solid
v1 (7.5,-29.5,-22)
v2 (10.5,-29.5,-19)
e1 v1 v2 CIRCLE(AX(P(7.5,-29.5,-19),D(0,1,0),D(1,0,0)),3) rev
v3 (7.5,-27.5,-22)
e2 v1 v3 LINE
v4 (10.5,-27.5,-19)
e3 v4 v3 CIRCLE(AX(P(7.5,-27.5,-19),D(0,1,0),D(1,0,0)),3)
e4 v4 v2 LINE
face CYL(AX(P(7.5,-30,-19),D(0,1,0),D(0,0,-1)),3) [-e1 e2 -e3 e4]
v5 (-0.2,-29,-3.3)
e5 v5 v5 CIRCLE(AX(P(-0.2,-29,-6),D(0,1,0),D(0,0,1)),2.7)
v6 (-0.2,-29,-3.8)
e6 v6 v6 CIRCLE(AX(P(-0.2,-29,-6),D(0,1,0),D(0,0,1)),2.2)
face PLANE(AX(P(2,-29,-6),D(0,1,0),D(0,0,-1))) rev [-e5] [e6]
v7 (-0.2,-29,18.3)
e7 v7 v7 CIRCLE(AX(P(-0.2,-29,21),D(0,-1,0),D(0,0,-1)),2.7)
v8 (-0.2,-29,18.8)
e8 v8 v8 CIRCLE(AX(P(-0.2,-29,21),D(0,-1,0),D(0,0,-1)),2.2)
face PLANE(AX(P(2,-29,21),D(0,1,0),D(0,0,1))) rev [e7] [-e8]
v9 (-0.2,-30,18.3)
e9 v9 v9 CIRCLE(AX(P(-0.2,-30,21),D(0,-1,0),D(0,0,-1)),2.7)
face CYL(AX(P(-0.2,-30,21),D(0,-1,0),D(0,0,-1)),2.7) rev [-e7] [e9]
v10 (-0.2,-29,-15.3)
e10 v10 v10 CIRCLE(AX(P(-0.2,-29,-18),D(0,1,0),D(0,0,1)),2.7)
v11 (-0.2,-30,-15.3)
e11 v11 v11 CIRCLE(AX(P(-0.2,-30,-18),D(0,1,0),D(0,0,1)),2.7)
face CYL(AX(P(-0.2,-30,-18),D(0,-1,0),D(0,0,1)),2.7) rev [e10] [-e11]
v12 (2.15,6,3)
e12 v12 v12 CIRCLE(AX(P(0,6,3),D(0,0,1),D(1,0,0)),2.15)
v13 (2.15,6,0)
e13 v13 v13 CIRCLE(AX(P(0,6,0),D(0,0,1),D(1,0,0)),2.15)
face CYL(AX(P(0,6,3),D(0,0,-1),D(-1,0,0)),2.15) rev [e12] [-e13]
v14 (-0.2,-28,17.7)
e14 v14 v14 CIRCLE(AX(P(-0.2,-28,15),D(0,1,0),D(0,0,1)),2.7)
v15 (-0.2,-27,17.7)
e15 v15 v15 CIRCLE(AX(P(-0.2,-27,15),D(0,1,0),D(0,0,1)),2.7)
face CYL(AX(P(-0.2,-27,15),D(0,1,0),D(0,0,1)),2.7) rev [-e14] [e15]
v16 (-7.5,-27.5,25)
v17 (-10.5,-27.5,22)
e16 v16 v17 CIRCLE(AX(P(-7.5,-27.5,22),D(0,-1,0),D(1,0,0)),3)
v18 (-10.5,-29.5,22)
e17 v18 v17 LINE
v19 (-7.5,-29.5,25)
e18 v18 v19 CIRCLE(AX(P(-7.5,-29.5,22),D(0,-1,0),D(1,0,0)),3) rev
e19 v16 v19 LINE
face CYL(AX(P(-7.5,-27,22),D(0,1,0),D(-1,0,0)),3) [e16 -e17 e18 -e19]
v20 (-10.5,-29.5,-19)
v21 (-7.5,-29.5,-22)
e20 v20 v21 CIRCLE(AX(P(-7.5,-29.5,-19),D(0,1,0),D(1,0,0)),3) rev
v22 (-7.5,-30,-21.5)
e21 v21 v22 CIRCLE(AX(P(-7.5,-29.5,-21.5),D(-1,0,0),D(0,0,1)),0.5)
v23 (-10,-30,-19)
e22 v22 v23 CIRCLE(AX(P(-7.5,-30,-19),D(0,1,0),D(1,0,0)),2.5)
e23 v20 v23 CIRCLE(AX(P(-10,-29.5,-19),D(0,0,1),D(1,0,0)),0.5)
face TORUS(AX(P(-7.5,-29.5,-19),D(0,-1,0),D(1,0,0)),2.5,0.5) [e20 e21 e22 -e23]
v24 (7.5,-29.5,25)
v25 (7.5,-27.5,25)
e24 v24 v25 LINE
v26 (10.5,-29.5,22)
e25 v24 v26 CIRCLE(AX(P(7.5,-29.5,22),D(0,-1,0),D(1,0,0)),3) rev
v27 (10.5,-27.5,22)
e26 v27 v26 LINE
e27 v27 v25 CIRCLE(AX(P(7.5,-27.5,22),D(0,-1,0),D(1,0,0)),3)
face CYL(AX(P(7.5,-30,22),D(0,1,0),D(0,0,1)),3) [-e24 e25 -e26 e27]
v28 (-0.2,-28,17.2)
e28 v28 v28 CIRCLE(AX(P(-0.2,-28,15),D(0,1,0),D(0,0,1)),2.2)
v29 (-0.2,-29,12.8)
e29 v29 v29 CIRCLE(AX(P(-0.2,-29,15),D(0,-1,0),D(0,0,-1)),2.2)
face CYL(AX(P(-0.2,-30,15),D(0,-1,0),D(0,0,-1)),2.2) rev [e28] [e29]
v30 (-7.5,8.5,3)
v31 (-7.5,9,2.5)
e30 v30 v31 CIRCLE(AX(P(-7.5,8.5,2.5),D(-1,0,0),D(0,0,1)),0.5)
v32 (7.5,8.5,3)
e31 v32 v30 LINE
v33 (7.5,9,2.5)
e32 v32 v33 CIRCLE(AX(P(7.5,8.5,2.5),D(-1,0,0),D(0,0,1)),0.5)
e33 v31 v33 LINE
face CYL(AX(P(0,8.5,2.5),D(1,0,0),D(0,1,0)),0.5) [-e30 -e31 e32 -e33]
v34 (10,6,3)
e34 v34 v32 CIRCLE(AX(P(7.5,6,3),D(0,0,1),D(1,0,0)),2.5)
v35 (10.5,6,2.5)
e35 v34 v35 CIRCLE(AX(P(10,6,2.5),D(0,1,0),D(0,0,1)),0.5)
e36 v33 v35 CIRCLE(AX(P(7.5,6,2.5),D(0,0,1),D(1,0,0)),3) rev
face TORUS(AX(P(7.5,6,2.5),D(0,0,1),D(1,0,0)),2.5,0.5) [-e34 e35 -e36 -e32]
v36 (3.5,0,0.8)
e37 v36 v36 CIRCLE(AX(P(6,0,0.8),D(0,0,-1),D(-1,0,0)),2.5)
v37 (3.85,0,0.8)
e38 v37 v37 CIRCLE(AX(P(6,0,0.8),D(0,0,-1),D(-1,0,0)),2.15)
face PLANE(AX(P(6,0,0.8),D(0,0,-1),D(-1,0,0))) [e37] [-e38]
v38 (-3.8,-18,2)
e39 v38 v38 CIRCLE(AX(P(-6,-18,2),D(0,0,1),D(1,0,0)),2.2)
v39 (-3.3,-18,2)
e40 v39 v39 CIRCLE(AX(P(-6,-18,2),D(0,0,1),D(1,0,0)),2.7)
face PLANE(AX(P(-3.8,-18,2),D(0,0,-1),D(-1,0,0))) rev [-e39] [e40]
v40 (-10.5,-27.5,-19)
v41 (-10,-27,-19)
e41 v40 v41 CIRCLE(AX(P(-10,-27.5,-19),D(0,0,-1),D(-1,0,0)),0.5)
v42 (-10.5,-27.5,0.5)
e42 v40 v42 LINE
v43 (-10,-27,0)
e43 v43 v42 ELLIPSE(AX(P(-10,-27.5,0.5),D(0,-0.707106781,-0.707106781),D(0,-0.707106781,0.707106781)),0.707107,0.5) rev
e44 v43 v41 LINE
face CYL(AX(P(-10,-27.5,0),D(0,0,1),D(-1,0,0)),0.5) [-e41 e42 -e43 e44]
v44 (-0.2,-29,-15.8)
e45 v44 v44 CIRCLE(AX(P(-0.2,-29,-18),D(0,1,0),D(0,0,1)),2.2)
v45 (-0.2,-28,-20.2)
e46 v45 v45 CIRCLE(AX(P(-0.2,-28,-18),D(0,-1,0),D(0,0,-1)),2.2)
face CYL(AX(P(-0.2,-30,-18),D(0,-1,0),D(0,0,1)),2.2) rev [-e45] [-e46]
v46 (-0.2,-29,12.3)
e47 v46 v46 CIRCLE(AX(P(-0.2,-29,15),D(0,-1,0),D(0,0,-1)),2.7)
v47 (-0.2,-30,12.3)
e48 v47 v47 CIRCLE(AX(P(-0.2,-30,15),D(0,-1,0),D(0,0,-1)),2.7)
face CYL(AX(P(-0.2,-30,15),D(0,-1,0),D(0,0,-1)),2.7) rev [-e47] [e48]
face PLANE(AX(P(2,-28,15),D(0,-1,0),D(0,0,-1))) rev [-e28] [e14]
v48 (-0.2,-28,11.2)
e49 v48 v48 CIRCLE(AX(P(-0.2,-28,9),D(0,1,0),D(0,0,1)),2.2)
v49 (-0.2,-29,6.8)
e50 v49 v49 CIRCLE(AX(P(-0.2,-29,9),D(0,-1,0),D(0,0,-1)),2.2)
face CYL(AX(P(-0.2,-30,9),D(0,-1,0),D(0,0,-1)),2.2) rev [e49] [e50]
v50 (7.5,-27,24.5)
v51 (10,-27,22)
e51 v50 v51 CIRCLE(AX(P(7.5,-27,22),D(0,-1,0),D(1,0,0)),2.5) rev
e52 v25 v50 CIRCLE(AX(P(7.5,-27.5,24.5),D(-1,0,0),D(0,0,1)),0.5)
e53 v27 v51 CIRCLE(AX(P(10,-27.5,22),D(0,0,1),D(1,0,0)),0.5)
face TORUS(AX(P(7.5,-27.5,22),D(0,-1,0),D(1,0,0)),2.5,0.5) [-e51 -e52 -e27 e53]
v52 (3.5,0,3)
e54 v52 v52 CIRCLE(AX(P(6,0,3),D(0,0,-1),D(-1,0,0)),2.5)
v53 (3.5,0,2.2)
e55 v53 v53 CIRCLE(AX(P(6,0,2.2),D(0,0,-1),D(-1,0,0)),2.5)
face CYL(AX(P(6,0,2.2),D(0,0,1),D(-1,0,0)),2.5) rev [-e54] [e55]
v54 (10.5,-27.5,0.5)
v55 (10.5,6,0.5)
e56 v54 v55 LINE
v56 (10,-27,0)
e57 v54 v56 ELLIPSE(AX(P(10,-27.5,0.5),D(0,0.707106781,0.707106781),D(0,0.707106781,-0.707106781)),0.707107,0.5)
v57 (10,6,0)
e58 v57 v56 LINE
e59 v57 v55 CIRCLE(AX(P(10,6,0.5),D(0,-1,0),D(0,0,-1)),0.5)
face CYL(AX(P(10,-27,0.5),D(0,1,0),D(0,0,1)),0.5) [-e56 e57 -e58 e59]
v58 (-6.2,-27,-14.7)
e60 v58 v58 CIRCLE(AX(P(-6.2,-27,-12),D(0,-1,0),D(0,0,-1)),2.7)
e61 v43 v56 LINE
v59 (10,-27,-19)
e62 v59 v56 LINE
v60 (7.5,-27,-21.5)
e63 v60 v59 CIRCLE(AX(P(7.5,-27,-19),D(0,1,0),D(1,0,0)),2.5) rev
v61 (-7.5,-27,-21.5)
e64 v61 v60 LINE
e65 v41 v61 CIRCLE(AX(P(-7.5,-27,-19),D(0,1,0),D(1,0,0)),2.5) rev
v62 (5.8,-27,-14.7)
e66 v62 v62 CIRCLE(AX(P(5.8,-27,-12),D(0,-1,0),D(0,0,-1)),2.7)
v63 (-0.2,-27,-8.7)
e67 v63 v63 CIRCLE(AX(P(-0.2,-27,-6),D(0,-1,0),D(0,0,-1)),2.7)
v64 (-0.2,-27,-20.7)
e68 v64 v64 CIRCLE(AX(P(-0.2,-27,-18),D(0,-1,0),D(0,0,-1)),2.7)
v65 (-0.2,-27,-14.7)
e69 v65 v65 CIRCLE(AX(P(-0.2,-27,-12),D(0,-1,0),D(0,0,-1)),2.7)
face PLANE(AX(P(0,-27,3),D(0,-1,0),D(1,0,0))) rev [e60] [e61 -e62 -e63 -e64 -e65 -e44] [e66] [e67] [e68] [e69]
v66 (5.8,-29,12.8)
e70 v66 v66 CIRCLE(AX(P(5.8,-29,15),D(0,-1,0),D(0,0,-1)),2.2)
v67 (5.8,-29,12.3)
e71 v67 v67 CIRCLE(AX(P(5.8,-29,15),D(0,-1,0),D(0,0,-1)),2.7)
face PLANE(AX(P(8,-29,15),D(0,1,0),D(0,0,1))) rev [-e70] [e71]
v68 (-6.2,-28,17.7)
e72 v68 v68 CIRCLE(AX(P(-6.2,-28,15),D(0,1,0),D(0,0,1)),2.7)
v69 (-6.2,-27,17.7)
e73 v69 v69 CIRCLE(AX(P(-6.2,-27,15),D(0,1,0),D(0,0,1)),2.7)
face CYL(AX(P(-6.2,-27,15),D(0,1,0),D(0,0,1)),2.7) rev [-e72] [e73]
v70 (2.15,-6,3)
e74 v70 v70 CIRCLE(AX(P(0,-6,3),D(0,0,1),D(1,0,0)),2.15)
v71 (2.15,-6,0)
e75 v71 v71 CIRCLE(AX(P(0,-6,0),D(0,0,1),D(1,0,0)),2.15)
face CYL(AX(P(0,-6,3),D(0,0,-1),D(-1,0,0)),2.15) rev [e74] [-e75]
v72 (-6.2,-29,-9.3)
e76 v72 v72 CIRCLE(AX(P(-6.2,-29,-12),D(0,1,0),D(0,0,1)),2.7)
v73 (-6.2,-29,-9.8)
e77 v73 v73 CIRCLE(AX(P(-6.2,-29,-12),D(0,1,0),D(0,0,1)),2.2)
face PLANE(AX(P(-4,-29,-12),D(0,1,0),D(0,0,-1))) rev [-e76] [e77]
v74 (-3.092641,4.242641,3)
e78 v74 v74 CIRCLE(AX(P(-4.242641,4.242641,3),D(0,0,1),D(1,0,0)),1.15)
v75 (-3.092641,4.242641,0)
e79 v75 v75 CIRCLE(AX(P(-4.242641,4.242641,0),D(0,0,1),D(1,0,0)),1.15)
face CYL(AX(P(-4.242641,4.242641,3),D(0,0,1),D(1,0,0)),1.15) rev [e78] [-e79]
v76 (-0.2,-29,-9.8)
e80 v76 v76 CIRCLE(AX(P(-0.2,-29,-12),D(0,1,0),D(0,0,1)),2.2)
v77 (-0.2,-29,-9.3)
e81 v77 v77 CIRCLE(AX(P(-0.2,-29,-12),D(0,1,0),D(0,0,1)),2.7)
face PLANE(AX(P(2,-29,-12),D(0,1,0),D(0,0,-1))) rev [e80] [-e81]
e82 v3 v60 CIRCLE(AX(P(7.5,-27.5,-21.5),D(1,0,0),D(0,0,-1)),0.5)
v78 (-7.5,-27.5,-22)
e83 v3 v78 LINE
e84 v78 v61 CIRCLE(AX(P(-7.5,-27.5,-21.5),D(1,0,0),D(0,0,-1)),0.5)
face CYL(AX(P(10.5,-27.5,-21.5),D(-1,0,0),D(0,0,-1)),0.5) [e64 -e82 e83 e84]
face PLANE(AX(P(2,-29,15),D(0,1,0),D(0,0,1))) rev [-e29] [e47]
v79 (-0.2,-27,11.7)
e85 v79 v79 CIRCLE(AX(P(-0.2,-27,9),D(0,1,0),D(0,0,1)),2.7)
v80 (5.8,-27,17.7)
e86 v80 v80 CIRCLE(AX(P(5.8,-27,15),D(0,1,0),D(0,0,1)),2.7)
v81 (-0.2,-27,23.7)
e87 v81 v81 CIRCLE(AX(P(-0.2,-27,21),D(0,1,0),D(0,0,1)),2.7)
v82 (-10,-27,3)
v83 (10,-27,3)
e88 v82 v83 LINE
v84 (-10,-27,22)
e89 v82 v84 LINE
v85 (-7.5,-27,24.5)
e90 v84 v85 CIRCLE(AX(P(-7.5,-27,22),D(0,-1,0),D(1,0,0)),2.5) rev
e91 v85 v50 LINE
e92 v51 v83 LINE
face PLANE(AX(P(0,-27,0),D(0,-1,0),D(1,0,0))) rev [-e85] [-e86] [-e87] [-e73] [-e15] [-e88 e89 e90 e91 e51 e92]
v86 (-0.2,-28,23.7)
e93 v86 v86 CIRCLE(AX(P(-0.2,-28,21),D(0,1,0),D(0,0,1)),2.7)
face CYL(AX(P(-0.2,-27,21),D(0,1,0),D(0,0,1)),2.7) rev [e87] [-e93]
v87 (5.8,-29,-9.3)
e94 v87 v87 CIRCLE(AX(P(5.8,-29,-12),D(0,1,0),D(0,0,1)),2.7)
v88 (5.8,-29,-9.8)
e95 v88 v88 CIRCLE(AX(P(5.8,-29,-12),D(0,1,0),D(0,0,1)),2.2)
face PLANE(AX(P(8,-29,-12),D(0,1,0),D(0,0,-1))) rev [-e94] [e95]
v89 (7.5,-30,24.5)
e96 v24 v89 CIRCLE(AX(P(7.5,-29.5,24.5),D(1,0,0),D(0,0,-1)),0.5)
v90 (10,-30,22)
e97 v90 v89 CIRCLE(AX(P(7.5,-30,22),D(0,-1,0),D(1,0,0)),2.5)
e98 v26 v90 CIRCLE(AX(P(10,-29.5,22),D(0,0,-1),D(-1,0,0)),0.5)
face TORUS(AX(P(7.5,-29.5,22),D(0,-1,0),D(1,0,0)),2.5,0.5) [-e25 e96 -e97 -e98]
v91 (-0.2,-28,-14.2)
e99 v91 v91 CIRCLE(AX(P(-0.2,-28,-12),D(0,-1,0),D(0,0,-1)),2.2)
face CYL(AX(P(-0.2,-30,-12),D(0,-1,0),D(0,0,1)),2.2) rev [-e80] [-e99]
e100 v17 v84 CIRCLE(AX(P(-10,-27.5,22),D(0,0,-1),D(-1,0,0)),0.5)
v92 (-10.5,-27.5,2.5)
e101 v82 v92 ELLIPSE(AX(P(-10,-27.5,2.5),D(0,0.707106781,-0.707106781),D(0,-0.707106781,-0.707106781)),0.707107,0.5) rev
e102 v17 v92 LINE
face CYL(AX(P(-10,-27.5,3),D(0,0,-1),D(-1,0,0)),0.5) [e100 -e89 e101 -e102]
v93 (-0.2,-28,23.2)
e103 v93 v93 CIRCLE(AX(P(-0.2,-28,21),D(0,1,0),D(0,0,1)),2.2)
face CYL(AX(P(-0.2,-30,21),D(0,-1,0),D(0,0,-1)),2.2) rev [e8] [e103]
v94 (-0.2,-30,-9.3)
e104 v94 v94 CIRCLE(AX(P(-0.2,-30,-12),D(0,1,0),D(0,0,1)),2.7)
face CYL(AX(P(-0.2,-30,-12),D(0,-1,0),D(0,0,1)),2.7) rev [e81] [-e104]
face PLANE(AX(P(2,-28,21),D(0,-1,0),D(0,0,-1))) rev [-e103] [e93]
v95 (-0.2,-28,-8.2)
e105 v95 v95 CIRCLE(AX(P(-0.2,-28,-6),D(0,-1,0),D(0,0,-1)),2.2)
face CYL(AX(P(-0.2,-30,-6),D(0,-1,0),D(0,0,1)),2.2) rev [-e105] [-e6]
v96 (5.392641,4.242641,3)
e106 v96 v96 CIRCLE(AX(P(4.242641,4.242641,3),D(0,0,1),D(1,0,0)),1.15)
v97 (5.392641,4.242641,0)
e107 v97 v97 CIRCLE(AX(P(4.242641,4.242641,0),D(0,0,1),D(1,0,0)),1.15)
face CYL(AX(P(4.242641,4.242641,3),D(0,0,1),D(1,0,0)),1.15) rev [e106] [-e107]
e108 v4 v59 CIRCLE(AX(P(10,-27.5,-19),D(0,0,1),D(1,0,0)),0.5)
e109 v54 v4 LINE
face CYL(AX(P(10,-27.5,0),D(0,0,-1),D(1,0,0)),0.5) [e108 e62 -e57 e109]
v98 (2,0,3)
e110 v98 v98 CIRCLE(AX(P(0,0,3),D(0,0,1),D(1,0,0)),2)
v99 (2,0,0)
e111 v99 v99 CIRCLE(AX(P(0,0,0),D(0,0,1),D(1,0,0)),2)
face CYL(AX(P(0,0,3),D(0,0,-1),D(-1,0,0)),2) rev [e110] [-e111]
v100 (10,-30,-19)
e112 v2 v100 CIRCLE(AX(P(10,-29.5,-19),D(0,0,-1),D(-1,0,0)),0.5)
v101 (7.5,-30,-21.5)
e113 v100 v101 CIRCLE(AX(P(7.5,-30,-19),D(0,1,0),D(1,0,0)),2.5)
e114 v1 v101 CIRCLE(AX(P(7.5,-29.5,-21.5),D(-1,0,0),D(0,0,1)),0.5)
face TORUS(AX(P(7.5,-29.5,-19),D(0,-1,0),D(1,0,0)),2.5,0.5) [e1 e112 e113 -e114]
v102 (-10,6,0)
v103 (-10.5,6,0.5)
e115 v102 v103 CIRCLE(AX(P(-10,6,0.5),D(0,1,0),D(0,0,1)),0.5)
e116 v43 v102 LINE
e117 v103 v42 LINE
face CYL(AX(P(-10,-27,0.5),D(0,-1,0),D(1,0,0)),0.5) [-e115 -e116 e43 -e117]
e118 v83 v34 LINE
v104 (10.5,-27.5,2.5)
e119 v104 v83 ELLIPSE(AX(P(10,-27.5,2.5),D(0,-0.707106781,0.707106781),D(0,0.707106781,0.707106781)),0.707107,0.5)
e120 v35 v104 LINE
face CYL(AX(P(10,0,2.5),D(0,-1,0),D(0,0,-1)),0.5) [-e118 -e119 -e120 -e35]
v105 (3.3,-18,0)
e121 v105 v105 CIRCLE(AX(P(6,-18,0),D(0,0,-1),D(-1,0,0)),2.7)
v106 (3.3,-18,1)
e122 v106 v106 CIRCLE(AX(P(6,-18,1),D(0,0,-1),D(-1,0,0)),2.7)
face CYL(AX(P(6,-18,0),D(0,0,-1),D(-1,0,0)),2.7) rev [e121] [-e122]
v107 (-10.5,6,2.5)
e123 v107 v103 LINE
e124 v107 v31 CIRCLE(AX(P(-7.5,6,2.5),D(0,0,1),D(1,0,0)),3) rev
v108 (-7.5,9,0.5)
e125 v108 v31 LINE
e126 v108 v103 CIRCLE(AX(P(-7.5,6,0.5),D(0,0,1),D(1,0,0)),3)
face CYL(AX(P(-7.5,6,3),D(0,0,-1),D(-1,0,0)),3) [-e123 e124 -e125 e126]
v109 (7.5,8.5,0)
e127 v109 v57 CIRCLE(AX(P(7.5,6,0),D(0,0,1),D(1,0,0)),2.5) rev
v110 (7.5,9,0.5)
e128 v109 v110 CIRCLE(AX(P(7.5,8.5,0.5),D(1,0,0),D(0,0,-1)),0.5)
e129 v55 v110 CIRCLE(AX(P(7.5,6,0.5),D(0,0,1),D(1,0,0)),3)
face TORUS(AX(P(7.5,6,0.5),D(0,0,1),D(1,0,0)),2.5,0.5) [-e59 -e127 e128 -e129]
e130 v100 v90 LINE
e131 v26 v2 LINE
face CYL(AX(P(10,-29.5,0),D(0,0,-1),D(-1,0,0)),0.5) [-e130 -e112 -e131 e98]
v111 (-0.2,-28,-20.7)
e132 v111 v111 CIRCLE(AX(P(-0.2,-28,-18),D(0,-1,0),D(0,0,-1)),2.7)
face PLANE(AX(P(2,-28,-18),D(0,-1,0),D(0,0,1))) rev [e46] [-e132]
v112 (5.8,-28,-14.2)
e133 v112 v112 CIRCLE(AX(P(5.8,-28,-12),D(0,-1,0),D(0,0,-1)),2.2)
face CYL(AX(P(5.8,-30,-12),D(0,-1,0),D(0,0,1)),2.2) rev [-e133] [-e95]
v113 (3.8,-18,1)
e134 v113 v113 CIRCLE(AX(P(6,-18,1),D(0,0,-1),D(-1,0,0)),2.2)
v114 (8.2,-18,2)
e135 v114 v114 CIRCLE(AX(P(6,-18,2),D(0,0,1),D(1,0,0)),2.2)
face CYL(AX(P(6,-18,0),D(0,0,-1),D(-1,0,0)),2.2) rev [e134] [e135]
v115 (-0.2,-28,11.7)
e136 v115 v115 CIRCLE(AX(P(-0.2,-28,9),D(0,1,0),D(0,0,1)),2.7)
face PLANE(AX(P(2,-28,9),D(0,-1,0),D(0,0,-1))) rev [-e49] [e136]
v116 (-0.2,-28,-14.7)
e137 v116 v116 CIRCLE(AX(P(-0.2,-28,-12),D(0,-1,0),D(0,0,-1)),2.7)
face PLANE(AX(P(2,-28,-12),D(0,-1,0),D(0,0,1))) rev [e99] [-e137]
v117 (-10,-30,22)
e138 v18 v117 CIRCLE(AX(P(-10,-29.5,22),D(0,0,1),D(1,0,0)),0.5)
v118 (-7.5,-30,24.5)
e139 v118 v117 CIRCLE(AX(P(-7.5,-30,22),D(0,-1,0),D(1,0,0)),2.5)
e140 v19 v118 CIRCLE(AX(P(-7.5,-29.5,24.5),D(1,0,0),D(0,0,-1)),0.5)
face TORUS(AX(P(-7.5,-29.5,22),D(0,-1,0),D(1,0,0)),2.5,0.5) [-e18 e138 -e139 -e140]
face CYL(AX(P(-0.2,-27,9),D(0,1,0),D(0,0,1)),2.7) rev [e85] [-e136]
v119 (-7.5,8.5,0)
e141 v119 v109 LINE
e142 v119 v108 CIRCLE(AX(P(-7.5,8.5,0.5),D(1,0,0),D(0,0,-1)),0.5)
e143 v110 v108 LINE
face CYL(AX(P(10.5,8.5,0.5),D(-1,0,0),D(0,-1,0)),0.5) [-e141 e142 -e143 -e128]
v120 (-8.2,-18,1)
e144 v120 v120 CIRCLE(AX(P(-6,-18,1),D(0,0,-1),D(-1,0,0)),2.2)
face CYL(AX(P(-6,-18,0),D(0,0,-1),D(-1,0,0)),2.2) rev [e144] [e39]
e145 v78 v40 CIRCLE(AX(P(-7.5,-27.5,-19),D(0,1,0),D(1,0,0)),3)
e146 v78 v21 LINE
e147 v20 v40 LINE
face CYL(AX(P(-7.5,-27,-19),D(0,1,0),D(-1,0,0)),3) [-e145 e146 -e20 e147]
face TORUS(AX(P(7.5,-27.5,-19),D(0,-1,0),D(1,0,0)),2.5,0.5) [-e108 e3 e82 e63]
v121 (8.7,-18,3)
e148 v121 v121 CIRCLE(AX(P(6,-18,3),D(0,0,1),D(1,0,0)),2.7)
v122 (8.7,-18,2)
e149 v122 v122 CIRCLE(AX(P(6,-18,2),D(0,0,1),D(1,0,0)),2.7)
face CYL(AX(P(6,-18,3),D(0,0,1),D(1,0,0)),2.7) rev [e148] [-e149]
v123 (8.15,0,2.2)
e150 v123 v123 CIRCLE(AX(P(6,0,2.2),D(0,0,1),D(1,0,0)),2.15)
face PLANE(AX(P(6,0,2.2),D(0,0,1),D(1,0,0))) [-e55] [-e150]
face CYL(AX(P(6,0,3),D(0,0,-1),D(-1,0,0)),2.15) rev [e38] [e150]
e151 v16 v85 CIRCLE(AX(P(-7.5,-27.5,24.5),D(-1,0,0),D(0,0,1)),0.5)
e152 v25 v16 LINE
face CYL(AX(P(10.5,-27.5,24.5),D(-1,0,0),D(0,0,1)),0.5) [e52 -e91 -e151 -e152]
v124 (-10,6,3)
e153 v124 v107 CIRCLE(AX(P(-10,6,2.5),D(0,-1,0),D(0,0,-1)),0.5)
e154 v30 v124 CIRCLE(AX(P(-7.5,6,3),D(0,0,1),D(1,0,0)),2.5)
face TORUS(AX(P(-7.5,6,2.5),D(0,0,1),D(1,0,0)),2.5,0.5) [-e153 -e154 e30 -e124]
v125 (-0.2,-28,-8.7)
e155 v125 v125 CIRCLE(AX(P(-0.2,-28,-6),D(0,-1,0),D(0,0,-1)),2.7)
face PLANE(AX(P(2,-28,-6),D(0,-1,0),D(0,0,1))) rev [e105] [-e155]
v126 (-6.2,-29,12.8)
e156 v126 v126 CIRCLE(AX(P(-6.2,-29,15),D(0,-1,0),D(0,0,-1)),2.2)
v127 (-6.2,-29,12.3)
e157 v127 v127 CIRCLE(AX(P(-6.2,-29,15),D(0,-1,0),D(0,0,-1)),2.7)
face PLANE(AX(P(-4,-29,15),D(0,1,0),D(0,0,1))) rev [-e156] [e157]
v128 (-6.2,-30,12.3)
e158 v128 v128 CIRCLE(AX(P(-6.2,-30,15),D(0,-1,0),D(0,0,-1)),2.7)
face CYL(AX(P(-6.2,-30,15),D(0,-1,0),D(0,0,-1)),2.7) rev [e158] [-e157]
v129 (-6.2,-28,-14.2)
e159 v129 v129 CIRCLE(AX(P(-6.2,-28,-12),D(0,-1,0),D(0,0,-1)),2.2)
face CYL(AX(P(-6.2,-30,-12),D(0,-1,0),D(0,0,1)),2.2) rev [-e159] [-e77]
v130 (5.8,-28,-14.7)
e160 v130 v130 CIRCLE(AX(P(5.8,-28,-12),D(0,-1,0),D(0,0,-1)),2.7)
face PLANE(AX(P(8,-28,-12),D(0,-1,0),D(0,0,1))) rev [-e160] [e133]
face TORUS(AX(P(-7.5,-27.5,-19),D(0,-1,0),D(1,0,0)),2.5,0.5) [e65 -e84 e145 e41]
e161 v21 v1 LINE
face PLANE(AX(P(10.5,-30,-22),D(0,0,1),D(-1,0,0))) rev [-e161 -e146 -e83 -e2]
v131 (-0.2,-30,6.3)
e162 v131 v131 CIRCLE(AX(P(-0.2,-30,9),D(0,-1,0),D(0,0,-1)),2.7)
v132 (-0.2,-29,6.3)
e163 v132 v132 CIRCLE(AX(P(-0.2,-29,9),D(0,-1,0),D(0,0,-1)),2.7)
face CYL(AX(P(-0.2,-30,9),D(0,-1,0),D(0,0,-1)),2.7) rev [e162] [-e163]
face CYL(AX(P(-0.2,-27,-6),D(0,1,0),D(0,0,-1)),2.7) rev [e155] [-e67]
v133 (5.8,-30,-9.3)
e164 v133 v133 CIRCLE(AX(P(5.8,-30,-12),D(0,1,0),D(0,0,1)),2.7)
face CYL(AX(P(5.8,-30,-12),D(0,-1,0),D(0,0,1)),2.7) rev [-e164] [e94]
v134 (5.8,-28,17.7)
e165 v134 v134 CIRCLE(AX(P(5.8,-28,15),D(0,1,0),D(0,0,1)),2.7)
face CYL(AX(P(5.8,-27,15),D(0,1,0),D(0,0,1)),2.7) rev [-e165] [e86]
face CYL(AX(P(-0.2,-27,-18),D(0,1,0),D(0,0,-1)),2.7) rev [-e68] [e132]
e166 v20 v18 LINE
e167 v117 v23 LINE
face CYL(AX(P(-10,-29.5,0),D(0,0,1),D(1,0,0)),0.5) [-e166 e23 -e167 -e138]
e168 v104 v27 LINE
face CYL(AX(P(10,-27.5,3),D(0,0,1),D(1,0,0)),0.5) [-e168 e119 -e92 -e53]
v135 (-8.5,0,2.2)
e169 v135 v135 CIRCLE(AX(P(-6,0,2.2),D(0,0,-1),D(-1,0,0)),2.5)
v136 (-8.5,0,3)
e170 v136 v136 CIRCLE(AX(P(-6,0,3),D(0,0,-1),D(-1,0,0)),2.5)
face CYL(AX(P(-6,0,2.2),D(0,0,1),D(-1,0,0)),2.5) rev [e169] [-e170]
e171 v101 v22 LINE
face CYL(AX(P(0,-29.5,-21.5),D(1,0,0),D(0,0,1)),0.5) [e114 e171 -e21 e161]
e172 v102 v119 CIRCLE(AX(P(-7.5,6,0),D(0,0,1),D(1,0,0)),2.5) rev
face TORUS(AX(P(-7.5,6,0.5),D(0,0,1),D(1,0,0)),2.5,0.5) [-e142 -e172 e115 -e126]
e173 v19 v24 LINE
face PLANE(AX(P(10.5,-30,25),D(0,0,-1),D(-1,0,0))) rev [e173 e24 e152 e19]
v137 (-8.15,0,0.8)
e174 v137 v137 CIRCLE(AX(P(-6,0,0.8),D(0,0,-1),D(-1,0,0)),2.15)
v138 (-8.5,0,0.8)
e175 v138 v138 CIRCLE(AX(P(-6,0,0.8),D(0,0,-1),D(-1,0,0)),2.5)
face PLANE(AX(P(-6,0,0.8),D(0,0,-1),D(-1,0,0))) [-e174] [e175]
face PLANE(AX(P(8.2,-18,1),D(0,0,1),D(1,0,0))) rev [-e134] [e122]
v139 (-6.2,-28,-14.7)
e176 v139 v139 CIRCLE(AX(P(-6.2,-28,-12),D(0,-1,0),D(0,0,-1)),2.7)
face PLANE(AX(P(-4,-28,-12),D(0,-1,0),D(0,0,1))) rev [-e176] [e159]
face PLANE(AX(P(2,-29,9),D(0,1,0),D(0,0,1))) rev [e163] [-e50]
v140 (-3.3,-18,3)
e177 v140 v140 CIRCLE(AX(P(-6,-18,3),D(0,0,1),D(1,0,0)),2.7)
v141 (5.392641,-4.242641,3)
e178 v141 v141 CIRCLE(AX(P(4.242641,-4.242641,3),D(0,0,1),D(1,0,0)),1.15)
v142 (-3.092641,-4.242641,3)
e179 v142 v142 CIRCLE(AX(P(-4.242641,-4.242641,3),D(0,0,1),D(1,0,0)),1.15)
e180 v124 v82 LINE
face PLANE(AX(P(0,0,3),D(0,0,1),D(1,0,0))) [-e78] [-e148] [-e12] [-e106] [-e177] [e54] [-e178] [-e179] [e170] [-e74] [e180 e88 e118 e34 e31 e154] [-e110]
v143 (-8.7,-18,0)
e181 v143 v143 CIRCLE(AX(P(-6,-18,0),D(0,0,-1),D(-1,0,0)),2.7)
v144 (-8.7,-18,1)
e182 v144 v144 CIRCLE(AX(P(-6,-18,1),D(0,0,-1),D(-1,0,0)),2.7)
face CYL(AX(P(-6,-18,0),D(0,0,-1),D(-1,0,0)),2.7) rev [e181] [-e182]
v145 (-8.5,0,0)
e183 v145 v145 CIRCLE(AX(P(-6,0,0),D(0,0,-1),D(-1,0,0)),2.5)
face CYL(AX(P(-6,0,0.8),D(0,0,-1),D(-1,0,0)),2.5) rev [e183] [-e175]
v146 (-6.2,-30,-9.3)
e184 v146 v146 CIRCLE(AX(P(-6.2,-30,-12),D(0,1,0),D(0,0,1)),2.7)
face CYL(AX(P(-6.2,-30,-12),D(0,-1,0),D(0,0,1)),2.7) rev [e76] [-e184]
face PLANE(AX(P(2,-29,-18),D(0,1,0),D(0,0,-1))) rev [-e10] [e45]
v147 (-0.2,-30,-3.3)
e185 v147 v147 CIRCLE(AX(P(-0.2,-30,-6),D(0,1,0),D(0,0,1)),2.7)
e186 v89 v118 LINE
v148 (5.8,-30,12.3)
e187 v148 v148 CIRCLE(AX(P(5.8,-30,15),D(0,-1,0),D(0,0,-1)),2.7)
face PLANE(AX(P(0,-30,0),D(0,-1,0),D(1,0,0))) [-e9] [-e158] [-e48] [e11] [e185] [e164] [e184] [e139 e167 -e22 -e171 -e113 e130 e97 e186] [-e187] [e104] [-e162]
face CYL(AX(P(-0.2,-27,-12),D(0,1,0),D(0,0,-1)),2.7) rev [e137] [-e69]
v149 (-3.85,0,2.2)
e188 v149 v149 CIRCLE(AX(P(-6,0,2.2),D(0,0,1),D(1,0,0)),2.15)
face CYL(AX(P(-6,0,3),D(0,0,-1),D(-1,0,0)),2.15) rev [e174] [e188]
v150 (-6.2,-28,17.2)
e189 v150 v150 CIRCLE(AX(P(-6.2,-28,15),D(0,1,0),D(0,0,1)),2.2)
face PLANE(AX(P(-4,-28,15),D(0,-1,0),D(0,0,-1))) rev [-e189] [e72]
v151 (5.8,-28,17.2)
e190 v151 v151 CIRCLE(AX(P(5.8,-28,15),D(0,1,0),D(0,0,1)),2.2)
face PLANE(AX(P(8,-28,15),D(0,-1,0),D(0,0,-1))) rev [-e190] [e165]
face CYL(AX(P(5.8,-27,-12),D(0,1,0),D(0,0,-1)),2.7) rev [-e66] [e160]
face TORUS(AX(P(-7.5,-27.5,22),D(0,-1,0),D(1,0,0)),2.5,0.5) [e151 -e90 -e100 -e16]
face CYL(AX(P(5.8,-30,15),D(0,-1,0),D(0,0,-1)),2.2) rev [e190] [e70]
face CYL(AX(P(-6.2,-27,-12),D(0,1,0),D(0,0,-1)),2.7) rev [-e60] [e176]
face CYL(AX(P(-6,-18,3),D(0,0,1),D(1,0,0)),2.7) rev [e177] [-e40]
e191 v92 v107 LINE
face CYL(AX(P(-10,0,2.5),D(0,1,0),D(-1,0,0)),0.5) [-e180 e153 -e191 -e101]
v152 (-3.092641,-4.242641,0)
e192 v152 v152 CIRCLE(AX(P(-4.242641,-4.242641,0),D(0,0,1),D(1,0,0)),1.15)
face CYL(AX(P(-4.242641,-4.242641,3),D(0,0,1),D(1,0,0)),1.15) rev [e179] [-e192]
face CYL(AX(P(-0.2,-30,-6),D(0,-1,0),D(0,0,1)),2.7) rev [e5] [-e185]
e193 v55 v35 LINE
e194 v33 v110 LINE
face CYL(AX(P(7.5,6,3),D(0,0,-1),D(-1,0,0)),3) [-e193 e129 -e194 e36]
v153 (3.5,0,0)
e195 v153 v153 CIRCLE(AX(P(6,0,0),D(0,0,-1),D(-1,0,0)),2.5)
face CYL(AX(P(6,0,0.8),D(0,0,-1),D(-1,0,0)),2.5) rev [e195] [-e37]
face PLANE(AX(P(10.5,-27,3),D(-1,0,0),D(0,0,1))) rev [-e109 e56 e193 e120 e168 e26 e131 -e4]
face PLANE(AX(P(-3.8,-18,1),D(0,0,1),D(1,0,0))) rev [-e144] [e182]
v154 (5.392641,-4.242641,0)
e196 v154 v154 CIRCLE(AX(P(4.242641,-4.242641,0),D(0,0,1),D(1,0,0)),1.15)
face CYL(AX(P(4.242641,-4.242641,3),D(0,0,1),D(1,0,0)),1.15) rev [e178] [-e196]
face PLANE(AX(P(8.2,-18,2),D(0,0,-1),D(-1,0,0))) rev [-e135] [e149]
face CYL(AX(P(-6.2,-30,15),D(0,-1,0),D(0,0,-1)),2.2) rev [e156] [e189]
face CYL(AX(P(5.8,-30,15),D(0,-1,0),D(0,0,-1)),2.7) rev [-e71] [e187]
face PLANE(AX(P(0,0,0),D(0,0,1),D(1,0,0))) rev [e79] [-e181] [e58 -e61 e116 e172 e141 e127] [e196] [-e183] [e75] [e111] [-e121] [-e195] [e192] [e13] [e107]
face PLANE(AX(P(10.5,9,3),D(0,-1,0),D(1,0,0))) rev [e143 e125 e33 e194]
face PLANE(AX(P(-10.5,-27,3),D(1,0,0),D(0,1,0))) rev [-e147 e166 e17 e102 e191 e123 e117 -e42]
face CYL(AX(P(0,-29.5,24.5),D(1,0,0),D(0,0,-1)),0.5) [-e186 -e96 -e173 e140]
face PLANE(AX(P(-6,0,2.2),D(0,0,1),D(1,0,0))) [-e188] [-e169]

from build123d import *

# Parameters (mm, degrees)
SKETCH1_W                                            = 21
SKETCH1_H                                            = 36
SKETCH1_R                                            = 2.15
SKETCH1_R_2                                          = 2
BOSS_EXTRUDE1_DEPTH                                  = 3
SKETCH2_R                                            = 2.65
SKETCH2_R_2                                          = 2.5
CUT_EXTRUDE1_DEPTH                                   = 0.8
SKETCH5_W                                            = 21
SKETCH5_H                                            = 25
BOSS_EXTRUDE2_DEPTH                                  = 3
HOLE1_D                                              = 4.4
HOLE1_CBORE_D                                        = 5.4
HOLE1_CBORE_DEPTH                                    = 1
CBORE_FOR_M1_6_HEX_SOCKET_HEAD_CAP_SCREW_D           = 2.3
CBORE_FOR_M1_6_HEX_SOCKET_HEAD_CAP_SCREW_CBORE_D     = 4
CBORE_FOR_M1_6_HEX_SOCKET_HEAD_CAP_SCREW_CBORE_DEPTH = 1
HOLE2_D                                              = 4.4
HOLE2_DEPTH                                          = 100
HOLE2_CBORE_D                                        = 5.4
HOLE2_CBORE_DEPTH                                    = 1
SKETCH15_R                                           = 2.5
CUT_EXTRUDE2_DEPTH                                   = 0.8
HOLE3_D                                              = 4.4
HOLE3_DEPTH                                          = 100
HOLE3_CBORE_D                                        = 5.4
HOLE3_CBORE_DEPTH                                    = 1
HOLE4_D                                              = 4.4
HOLE4_DEPTH                                          = 100
HOLE4_CBORE_D                                        = 5.4
HOLE4_CBORE_DEPTH                                    = 1
FILLET4_R                                            = 3
FILLET5_R                                            = 0.5


with BuildPart() as part:
    # Sketch1 → Boss-Extrude1 (new body)
    with BuildSketch(Plane.XY):
        with Locations((0, -9)):
            Rectangle(SKETCH1_W, SKETCH1_H)
        with Locations((-6, 0)):
            Circle(SKETCH1_R, mode=Mode.SUBTRACT)
        with Locations((0, 6)):
            Circle(SKETCH1_R, mode=Mode.SUBTRACT)
        Circle(SKETCH1_R_2, mode=Mode.SUBTRACT)
        with Locations((6, 0)):
            Circle(SKETCH1_R, mode=Mode.SUBTRACT)
        with Locations((0, -6)):
            Circle(SKETCH1_R, mode=Mode.SUBTRACT)
    extrude(amount=BOSS_EXTRUDE1_DEPTH)

    # Sketch2 → Cut-Extrude1 (cut)
    with BuildSketch(Plane.XY.offset(3)):
        with Locations((-6, 0)):
            Circle(SKETCH2_R)
        with Locations((0, 6)):
            Circle(SKETCH2_R)
        with Locations((6, 0)):
            Circle(SKETCH2_R)
        with Locations((0, -6)):
            Circle(SKETCH2_R)
        Circle(SKETCH2_R_2)
    extrude(amount=-CUT_EXTRUDE1_DEPTH, mode=Mode.SUBTRACT)

    # Sketch5 → Boss-Extrude2 (add)
    with BuildSketch(Plane.XZ.offset(27)):
        with Locations((0, 12.5)):
            Rectangle(SKETCH5_W, SKETCH5_H)
    extrude(amount=BOSS_EXTRUDE2_DEPTH)

    # Hole1 (through all)
    with Locations(Plane(origin=(0, -30, 0), x_dir=(-1, 0, 0), z_dir=(0, -1, 0))):
        with Locations((0.2, -21), (6.2, -15), (0.2, -15), (-5.8, -15), (0.2, -9)):
            CounterBoreHole(HOLE1_D / 2, HOLE1_CBORE_D / 2, HOLE1_CBORE_DEPTH)

    # CBORE for M1.6 Hex Socket Head Cap Screw1 (through all)
    with Locations(Plane.XY.offset(3)):
        with Locations((-4.242640687, 4.242640687), (-4.242640687, -4.242640687), (4.242640687, -4.242640687), (4.242640687, 4.242640687)):
            CounterBoreHole(CBORE_FOR_M1_6_HEX_SOCKET_HEAD_CAP_SCREW_D / 2, CBORE_FOR_M1_6_HEX_SOCKET_HEAD_CAP_SCREW_CBORE_D / 2, CBORE_FOR_M1_6_HEX_SOCKET_HEAD_CAP_SCREW_CBORE_DEPTH)

    # Hole2
    with Locations(Plane(origin=(1.593871803, -9.474841874, 0), x_dir=(1, 0, 0), z_dir=(0, 0, -1))):
        with Locations((4.406128197, 8.525158126), (-7.593871803, 8.525158126)):
            CounterBoreHole(HOLE2_D / 2, HOLE2_CBORE_D / 2, HOLE2_CBORE_DEPTH, depth=HOLE2_DEPTH)

    # Sketch15 → Cut-Extrude2 (cut)
    with BuildSketch(Plane(origin=(0, 0, 0), x_dir=(-1, 0, 0), z_dir=(0, 0, -1))):
        with Locations((-6, 0)):
            Circle(SKETCH15_R)
        with Locations((6, 0)):
            Circle(SKETCH15_R)
    extrude(amount=-CUT_EXTRUDE2_DEPTH, mode=Mode.SUBTRACT)

    # Hole3
    with Locations(Plane.XY.offset(3)):
        with Locations((-6, -18), (6, -18)):
            CounterBoreHole(HOLE3_D / 2, HOLE3_CBORE_D / 2, HOLE3_CBORE_DEPTH, depth=HOLE3_DEPTH)

    # Hole4
    with Locations(Plane(origin=(0, -27, 0), x_dir=(1, 0, 0), z_dir=(0, 1, 0))):
        with Locations((-0.2, -21), (-6.2, -15), (-0.2, -15), (5.8, -15), (-0.2, -9)):
            CounterBoreHole(HOLE4_D / 2, HOLE4_CBORE_D / 2, HOLE4_CBORE_DEPTH, depth=HOLE4_DEPTH)

    # Fillet4
    fillet4_edges = [part.edges().sort_by_distance(p)[0] for p in [
        (10.5, -28.5, 25),
        (-10.5, -28.5, 25),
        (-10.5, 9, 1.5),
        (10.5, 9, 1.5),
    ]]
    fillet(fillet4_edges, radius=FILLET4_R)

    # Fillet5
    # the kernel refuses this fillet: 0.5 mm, written as the material it takes off along each edge
    with BuildSketch(Plane(origin=(-10.5, -27, 3), x_dir=(1, 0, 0), z_dir=(0, 0, 1))) as fillet5_piece_1:
        with BuildLine():
            CenterArc((FILLET5_R, -FILLET5_R), FILLET5_R, 90, 90)
            Line((0, -FILLET5_R), (0, 0))
            Line((0, 0), (FILLET5_R, 0))
        make_face()
    extrude(amount=19, mode=Mode.SUBTRACT)
    with BuildSketch(Plane(origin=(10.5, -27, 22), x_dir=(0, -1, 0), z_dir=(0, 0, -1))) as fillet5_piece_2:
        with BuildLine():
            CenterArc((FILLET5_R, FILLET5_R), FILLET5_R, 180, 90)
            Line((0, FILLET5_R), (0, 0))
            Line((0, 0), (FILLET5_R, 0))
        make_face()
    extrude(amount=19, mode=Mode.SUBTRACT)
    with BuildSketch(Plane(origin=(-7.5, -27, 25), x_dir=(0, 0, -1), z_dir=(1, 0, 0)), Plane(origin=(-7.5, 9, 0), x_dir=(0, -1, 0), z_dir=(1, 0, 0))) as fillet5_piece_3:
        with BuildLine():
            CenterArc((FILLET5_R, -FILLET5_R), FILLET5_R, 90, 90)
            Line((0, -FILLET5_R), (0, 0))
            Line((0, 0), (FILLET5_R, 0))
        make_face()
    extrude(amount=15, mode=Mode.SUBTRACT)
    with BuildSketch(Plane(origin=(10.5, -30, 22), x_dir=(0, 1, 0), z_dir=(0, 0, -1))) as fillet5_piece_4:
        with BuildLine():
            CenterArc((FILLET5_R, -FILLET5_R), FILLET5_R, 90, 90)
            Line((0, -FILLET5_R), (0, 0))
            Line((0, 0), (FILLET5_R, 0))
        make_face()
    extrude(amount=23.25, mode=Mode.SUBTRACT)
    with BuildSketch(Plane(origin=(-7.5, -30, 25), x_dir=(0, 0, -1), z_dir=(1, 0, 0)), Plane(origin=(-7.5, 9, 3), x_dir=(0, -1, 0), z_dir=(1, 0, 0))) as fillet5_piece_5:
        with BuildLine():
            CenterArc((FILLET5_R, FILLET5_R), FILLET5_R, 180, 90)
            Line((0, FILLET5_R), (0, 0))
            Line((0, 0), (FILLET5_R, 0))
        make_face()
    extrude(amount=15, mode=Mode.SUBTRACT)
    with BuildSketch(Plane(origin=(-10.5, -30, -1.25), x_dir=(1, 0, 0), z_dir=(0, 0, 1))) as fillet5_piece_6:
        with BuildLine():
            CenterArc((FILLET5_R, FILLET5_R), FILLET5_R, 180, 90)
            Line((0, FILLET5_R), (0, 0))
            Line((0, 0), (FILLET5_R, 0))
        make_face()
    extrude(amount=23.25, mode=Mode.SUBTRACT)
    with BuildSketch(Plane(origin=(-10.5, -31.25, 0), x_dir=(1, 0, 0), z_dir=(0, 1, 0)), Plane(origin=(10.5, -31.25, 0), x_dir=(0, 0, 1), z_dir=(0, 1, 0))) as fillet5_piece_7:
        with BuildLine():
            CenterArc((FILLET5_R, -FILLET5_R), FILLET5_R, 90, 90)
            Line((0, -FILLET5_R), (0, 0))
            Line((0, 0), (FILLET5_R, 0))
        make_face()
    extrude(amount=37.25, mode=Mode.SUBTRACT)
    with BuildSketch(Plane(origin=(10.5, 6, 3), x_dir=(0, 0, -1), z_dir=(0, -1, 0))) as fillet5_piece_8:
        with BuildLine():
            CenterArc((FILLET5_R, -FILLET5_R), FILLET5_R, 90, 90)
            Line((0, -FILLET5_R), (0, 0))
            Line((0, 0), (FILLET5_R, 0))
        make_face()
    extrude(amount=33, mode=Mode.SUBTRACT)
    with BuildSketch(Plane(origin=(-10.5, -27, 3), x_dir=(1, 0, 0), z_dir=(0, 1, 0))) as fillet5_piece_9:
        with BuildLine():
            CenterArc((FILLET5_R, FILLET5_R), FILLET5_R, 180, 90)
            Line((0, FILLET5_R), (0, 0))
            Line((0, 0), (FILLET5_R, 0))
        make_face()
    extrude(amount=33, mode=Mode.SUBTRACT)
    with BuildSketch(Plane(origin=(7.5, -27, 22), x_dir=(1, 0, 0), z_dir=(0, 0, -1))) as fillet5_piece_10:
        with BuildLine():
            CenterArc((3 - FILLET5_R, FILLET5_R), FILLET5_R, 270, 90)
            Line((3, FILLET5_R), (3, 0))
            Line((3, 0), (3 - FILLET5_R, 0))
        make_face()
    revolve(axis=Axis((7.5, -27, 22), (0, -1, 0)), revolution_arc=90, mode=Mode.SUBTRACT)
    with BuildSketch(Plane(origin=(7.5, -30, 22), x_dir=(1, 0, 0), z_dir=(0, 0, -1))) as fillet5_piece_11:
        with BuildLine():
            CenterArc((3 - FILLET5_R, -FILLET5_R), FILLET5_R, 0, 90)
            Line((3 - FILLET5_R, 0), (3, 0))
            Line((3, 0), (3, -FILLET5_R))
        make_face()
    revolve(axis=Axis((7.5, -30, 22), (0, -1, 0)), revolution_arc=90, mode=Mode.SUBTRACT)
    with BuildSketch(Plane(origin=(-7.5, -27, 22), x_dir=(-1, 0, 0), z_dir=(0, 0, -1))) as fillet5_piece_12:
        with BuildLine():
            CenterArc((3 - FILLET5_R, -FILLET5_R), FILLET5_R, 0, 90)
            Line((3, -FILLET5_R), (3, 0))
            Line((3, 0), (3 - FILLET5_R, 0))
        make_face()
    revolve(axis=Axis((-7.5, -27, 22), (0, 1, 0)), revolution_arc=90, mode=Mode.SUBTRACT)
    with BuildSketch(Plane(origin=(-7.5, -30, 22), x_dir=(-1, 0, 0), z_dir=(0, 0, -1))) as fillet5_piece_13:
        with BuildLine():
            CenterArc((3 - FILLET5_R, FILLET5_R), FILLET5_R, 270, 90)
            Line((3, FILLET5_R), (3, 0))
            Line((3, 0), (3 - FILLET5_R, 0))
        make_face()
    revolve(axis=Axis((-7.5, -30, 22), (0, 1, 0)), revolution_arc=90, mode=Mode.SUBTRACT)
    with BuildSketch(Plane(origin=(-7.5, 6, 3), x_dir=(-1, 0, 0), z_dir=(0, -1, 0))) as fillet5_piece_14:
        with BuildLine():
            CenterArc((3 - FILLET5_R, FILLET5_R), FILLET5_R, 270, 90)
            Line((3, FILLET5_R), (3, 0))
            Line((3, 0), (3 - FILLET5_R, 0))
        make_face()
    revolve(axis=Axis((-7.5, 6, 3), (0, 0, -1)), revolution_arc=90, mode=Mode.SUBTRACT)
    with BuildSketch(Plane(origin=(-7.5, 6, 0), x_dir=(-1, 0, 0), z_dir=(0, -1, 0))) as fillet5_piece_15:
        with BuildLine():
            CenterArc((3 - FILLET5_R, -FILLET5_R), FILLET5_R, 0, 90)
            Line((3, -FILLET5_R), (3, 0))
            Line((3, 0), (3 - FILLET5_R, 0))
        make_face()
    revolve(axis=Axis((-7.5, 6, 0), (0, 0, -1)), revolution_arc=90, mode=Mode.SUBTRACT)
    with BuildSketch(Plane(origin=(7.5, 6, 3), x_dir=(1, 0, 0), z_dir=(0, -1, 0))) as fillet5_piece_16:
        with BuildLine():
            CenterArc((3 - FILLET5_R, -FILLET5_R), FILLET5_R, 0, 90)
            Line((3, -FILLET5_R), (3, 0))
            Line((3, 0), (3 - FILLET5_R, 0))
        make_face()
    revolve(axis=Axis((7.5, 6, 3), (0, 0, 1)), revolution_arc=90, mode=Mode.SUBTRACT)
    with BuildSketch(Plane(origin=(7.5, 6, 0), x_dir=(1, 0, 0), z_dir=(0, -1, 0))) as fillet5_piece_17:
        with BuildLine():
            CenterArc((3 - FILLET5_R, FILLET5_R), FILLET5_R, 270, 90)
            Line((3 - FILLET5_R, 0), (3, 0))
            Line((3, 0), (3, FILLET5_R))
        make_face()
    revolve(axis=Axis((7.5, 6, 0), (0, 0, 1)), revolution_arc=90, mode=Mode.SUBTRACT)
    with BuildSketch(Plane(origin=(-10.5, -28.25, 3), x_dir=(1, 0, 0), z_dir=(0, 1, 0))) as fillet5_piece_18a_section:
        with BuildLine():
            CenterArc((FILLET5_R, FILLET5_R), FILLET5_R, 180, 90)
            Line((0, FILLET5_R), (0, 0))
            Line((0, 0), (FILLET5_R, 0))
        make_face()
    fillet5_piece_18a = extrude(amount=34.25, mode=Mode.PRIVATE)
    fillet5_piece_18a = split(fillet5_piece_18a, bisect_by=Plane(origin=(-10.386802443, -27, 2.886802443), z_dir=(0, -1, 0)), keep=Keep.TOP, mode=Mode.PRIVATE)
    with BuildSketch(Plane(origin=(-10.5, -27, 1.75), x_dir=(1, 0, 0), z_dir=(0, 0, 1))) as fillet5_piece_18b_section:
        with BuildLine():
            CenterArc((FILLET5_R, -FILLET5_R), FILLET5_R, 90, 90)
            Line((0, -FILLET5_R), (0, 0))
            Line((0, 0), (FILLET5_R, 0))
        make_face()
    fillet5_piece_18b = extrude(amount=20.25, mode=Mode.PRIVATE)
    fillet5_piece_18b = split(fillet5_piece_18b, bisect_by=Plane(origin=(-10.386802443, -27.113197557, 3), z_dir=(0, 0, -1)), keep=Keep.TOP, mode=Mode.PRIVATE)
    fillet5_piece_18 = fillet5_piece_18a & fillet5_piece_18b
    add(fillet5_piece_18, mode=Mode.SUBTRACT)
    with BuildSketch(Plane(origin=(10.5, 6, 3), x_dir=(0, 0, -1), z_dir=(0, -1, 0))) as fillet5_piece_19a_section:
        with BuildLine():
            CenterArc((FILLET5_R, -FILLET5_R), FILLET5_R, 90, 90)
            Line((0, -FILLET5_R), (0, 0))
            Line((0, 0), (FILLET5_R, 0))
        make_face()
    fillet5_piece_19a = extrude(amount=34.25, mode=Mode.PRIVATE)
    fillet5_piece_19a = split(fillet5_piece_19a, bisect_by=Plane(origin=(10.386802443, -27, 2.886802443), z_dir=(0, -1, 0)), keep=Keep.TOP, mode=Mode.PRIVATE)
    with BuildSketch(Plane(origin=(10.5, -27, 22), x_dir=(0, -1, 0), z_dir=(0, 0, -1))) as fillet5_piece_19b_section:
        with BuildLine():
            CenterArc((FILLET5_R, FILLET5_R), FILLET5_R, 180, 90)
            Line((0, FILLET5_R), (0, 0))
            Line((0, 0), (FILLET5_R, 0))
        make_face()
    fillet5_piece_19b = extrude(amount=20.25, mode=Mode.PRIVATE)
    fillet5_piece_19b = split(fillet5_piece_19b, bisect_by=Plane(origin=(10.386802443, -27.113197557, 3), z_dir=(0, 0, -1)), keep=Keep.TOP, mode=Mode.PRIVATE)
    fillet5_piece_19 = fillet5_piece_19a & fillet5_piece_19b
    add(fillet5_piece_19, mode=Mode.SUBTRACT)

    # Mirror1: part across plane


with BuildPart() as part_1:
    add(part.part)
    add(part.part.mirror(Plane.XY.offset(1.5)))


solid = part_1.part
